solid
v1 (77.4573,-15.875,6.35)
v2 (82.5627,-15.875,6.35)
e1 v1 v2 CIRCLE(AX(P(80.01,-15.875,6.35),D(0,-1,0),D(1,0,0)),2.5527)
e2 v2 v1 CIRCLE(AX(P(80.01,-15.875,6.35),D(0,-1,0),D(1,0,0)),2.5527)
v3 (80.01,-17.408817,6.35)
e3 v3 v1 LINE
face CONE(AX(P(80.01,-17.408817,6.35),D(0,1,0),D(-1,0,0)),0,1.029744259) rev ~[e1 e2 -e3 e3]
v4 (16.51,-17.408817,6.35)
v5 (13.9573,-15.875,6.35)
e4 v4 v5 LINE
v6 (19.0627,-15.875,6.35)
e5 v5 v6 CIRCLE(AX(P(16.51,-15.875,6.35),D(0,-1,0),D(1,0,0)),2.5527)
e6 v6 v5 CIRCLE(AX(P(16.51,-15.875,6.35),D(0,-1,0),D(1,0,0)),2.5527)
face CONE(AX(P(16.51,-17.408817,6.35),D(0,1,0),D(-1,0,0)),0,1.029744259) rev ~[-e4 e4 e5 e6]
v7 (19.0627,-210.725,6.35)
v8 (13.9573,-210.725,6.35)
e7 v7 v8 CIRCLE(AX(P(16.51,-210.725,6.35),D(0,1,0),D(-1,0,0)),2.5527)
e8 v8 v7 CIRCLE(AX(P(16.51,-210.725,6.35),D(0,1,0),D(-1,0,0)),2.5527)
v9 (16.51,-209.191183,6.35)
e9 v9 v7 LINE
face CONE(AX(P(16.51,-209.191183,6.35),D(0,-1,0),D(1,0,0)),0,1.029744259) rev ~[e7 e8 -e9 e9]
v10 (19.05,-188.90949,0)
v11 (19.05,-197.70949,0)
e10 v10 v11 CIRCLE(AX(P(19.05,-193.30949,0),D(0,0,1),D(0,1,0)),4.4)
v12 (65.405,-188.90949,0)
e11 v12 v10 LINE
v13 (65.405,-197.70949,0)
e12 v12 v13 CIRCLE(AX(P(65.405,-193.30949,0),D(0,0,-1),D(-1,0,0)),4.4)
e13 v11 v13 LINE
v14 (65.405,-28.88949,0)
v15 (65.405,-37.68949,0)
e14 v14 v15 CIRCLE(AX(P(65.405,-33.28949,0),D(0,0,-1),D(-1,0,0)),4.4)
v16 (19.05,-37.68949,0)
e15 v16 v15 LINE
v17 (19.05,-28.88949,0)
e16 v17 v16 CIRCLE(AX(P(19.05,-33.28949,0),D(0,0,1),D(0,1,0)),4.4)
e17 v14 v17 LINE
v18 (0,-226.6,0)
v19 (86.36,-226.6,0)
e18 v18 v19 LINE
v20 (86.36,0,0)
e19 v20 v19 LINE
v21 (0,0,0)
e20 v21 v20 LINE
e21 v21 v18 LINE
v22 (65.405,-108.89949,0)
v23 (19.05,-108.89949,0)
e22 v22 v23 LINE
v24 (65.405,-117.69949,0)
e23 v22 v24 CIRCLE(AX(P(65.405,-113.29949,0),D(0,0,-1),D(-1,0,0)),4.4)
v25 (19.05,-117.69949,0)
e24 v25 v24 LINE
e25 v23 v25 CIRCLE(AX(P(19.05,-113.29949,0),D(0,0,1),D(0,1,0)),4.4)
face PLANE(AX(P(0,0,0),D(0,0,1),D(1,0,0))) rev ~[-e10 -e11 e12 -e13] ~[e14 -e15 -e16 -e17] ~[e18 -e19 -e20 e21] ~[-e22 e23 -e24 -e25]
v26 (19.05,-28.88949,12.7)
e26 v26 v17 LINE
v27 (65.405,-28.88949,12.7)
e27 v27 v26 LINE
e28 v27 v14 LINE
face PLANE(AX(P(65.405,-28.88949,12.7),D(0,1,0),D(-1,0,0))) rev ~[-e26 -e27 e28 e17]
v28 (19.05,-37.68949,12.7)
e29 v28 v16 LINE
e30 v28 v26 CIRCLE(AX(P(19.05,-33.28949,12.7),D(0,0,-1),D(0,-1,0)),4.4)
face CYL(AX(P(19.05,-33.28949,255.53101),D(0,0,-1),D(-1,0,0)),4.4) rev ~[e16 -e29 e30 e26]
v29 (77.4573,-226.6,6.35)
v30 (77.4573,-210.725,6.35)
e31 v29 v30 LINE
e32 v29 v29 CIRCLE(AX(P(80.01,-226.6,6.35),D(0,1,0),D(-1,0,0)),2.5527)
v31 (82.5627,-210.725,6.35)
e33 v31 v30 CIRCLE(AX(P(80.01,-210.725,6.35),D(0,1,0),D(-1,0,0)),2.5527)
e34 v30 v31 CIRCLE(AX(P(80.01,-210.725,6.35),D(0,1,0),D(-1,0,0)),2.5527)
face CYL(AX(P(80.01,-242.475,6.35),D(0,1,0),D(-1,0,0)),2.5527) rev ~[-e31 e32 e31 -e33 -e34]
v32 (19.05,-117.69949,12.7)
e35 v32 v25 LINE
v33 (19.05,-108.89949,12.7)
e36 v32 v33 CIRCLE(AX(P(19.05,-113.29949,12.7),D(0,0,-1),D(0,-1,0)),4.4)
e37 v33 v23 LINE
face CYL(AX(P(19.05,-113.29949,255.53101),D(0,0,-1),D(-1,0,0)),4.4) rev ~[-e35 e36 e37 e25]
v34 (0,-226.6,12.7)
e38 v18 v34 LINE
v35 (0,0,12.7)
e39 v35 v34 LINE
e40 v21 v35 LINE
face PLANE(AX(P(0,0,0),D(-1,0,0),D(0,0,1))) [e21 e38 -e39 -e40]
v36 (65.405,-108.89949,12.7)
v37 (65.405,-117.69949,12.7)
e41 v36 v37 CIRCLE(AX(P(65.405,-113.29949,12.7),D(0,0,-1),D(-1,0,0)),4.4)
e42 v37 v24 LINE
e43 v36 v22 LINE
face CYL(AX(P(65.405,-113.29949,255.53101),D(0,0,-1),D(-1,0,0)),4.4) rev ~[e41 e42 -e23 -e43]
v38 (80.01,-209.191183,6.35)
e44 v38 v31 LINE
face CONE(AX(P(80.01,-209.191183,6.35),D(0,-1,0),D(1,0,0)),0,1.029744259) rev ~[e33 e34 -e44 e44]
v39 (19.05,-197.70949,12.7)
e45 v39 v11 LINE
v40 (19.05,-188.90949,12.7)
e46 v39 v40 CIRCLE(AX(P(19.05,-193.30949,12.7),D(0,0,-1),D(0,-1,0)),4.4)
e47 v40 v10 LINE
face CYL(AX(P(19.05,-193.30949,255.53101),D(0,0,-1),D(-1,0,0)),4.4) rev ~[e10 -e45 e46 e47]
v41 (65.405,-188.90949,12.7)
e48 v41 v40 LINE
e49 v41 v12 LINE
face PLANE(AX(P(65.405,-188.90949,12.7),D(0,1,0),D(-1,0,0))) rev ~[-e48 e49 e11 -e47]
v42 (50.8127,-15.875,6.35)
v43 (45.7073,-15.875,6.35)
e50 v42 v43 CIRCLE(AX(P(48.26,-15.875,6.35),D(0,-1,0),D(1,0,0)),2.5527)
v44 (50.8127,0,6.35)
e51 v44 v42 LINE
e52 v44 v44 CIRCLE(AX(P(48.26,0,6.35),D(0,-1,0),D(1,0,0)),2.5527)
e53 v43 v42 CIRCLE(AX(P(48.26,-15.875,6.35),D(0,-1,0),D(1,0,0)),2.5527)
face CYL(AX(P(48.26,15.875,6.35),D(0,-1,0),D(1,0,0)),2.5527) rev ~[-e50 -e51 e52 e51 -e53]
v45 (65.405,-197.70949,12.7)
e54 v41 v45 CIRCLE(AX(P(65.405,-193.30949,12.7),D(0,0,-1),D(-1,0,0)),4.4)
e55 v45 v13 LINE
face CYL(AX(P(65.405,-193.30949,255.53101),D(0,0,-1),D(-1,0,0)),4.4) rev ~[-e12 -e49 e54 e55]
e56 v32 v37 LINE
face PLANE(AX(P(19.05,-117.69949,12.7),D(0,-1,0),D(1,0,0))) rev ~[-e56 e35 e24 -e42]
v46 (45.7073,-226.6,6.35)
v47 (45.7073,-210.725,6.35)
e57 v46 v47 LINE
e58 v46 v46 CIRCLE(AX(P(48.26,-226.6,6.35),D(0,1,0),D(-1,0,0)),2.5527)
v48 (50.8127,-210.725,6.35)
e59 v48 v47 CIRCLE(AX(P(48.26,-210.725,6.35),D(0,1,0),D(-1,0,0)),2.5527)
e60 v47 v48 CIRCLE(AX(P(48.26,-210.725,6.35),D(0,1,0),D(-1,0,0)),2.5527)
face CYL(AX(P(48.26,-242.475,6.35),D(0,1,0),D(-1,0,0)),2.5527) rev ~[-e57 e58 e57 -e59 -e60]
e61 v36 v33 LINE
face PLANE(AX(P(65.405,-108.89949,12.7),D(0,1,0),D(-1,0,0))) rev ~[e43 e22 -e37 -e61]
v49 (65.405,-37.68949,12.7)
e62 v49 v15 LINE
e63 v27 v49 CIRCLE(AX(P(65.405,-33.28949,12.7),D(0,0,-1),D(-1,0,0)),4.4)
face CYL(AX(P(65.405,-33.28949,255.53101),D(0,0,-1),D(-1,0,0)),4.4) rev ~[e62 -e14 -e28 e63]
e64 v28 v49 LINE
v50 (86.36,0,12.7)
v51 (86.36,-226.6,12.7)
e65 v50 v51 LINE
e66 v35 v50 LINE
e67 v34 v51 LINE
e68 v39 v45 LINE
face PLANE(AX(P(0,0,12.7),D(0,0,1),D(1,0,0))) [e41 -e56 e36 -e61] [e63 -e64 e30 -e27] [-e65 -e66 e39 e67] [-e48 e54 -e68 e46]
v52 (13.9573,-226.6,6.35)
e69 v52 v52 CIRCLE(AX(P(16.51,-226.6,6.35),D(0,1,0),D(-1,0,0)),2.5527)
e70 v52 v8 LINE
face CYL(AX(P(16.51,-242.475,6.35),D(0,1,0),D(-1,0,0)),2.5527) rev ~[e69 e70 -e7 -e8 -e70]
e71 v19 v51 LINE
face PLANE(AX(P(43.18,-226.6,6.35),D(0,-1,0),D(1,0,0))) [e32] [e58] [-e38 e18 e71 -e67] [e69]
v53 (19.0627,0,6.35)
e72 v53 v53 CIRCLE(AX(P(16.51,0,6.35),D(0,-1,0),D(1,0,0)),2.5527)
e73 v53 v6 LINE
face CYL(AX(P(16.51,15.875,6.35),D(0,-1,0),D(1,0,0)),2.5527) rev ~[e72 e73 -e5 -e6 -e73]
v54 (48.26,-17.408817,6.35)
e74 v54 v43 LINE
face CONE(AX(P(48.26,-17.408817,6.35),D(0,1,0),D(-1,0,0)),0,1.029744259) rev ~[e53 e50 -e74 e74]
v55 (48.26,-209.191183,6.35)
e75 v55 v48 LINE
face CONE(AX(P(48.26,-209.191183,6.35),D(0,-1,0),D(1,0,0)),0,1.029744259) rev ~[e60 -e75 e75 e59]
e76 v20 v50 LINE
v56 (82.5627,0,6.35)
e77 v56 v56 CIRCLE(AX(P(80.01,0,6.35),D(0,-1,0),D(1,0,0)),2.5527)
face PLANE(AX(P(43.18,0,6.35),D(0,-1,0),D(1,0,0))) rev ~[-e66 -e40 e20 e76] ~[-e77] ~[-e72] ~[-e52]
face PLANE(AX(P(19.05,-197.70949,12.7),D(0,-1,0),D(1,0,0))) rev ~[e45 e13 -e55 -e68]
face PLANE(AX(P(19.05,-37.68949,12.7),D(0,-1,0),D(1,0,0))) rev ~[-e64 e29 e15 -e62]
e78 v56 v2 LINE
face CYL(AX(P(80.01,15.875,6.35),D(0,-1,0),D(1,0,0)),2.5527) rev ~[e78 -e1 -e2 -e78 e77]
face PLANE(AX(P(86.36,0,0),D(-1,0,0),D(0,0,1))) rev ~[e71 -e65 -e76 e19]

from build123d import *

# Parameters (mm, degrees)
F0_W     = 86.36
F0_H     = 12.7
F1_DEPTH = 226.6
F3_D     = 8.8
F6_D     = 5.1054
F6_DEPTH = 15.875
F6_TIP   = 1.5338169022
F8_D     = 5.1054
F8_DEPTH = 15.875
F8_TIP   = 1.5338169022
F9_DEPTH = 25.4


# Not quite as in the source:
# - a feature names something its author has since deleted; it is built from what else it names


with BuildPart() as f1:
    # F0 (on Front) → F1 (new body)
    with BuildSketch(Plane.XZ):
        with Locations((43.18, 6.35)):
            Rectangle(F0_W, F0_H)
    extrude(amount=F1_DEPTH)

    # F3 (through all)
    with Locations(Plane.XY.offset(12.7)):
        with Locations((19.05, -113.29949), (65.405, -113.29949), (65.405, -33.28949), (19.05, -193.30949), (65.405, -193.30949), (19.05, -33.28949)):
            Hole(F3_D / 2)

    # F6
    with Locations(Plane.XZ.offset(226.6)):
        with Locations((16.51, 6.35), (48.26, 6.35), (80.01, 6.35)):
            Hole(F6_D / 2, depth=F6_DEPTH)
            with Locations((0, 0, -(F6_DEPTH + F6_TIP / 2))):  # 118° drill point
                Cone(0, F6_D / 2, F6_TIP, mode=Mode.SUBTRACT)

    # F8
    with Locations(Plane(origin=(0, 0, 0), x_dir=(-1, 0, 0), z_dir=(0, 1, 0))):
        with Locations((-80.01, 6.35), (-48.26, 6.35), (-16.51, 6.35)):
            Hole(F8_D / 2, depth=F8_DEPTH)
            with Locations((0, 0, -(F8_DEPTH + F8_TIP / 2))):  # 118° drill point
                Cone(0, F8_D / 2, F8_TIP, mode=Mode.SUBTRACT)

    # F4 (on face) → F9 (cut)
    with BuildSketch(Plane.XY.offset(12.7)):
        with BuildLine():
            ThreePointArc((23.45, -193.30949), (22.1612698372, -196.4207598372), (19.05, -197.70949))
            Line((19.05, -197.70949), (65.405, -197.70949))
            ThreePointArc((65.405, -197.70949), (61.005, -193.30949), (65.405, -188.90949))
            Line((65.405, -188.90949), (19.05, -188.90949))
            ThreePointArc((19.05, -188.90949), (22.1612698372, -190.1982201628), (23.45, -193.30949))
        make_face()
        with BuildLine():
            ThreePointArc((65.405, -117.69949), (61.005, -113.29949), (65.405, -108.89949))
            Line((65.405, -108.89949), (19.05, -108.89949))
            ThreePointArc((19.05, -108.89949), (22.1612698372, -110.1882201628), (23.45, -113.29949))
            ThreePointArc((23.45, -113.29949), (22.1612698372, -116.4107598372), (19.05, -117.69949))
            Line((19.05, -117.69949), (65.405, -117.69949))
        make_face()
        with BuildLine():
            ThreePointArc((65.405, -37.68949), (61.005, -33.28949), (65.405, -28.88949))
            Line((65.405, -28.88949), (19.05, -28.88949))
            ThreePointArc((19.05, -28.88949), (22.1612698372, -30.1782201628), (23.45, -33.28949))
            ThreePointArc((23.45, -33.28949), (22.1612698372, -36.4007598372), (19.05, -37.68949))
            Line((19.05, -37.68949), (65.405, -37.68949))
        make_face()
    extrude(amount=-F9_DEPTH, mode=Mode.SUBTRACT)


solid = f1.part
